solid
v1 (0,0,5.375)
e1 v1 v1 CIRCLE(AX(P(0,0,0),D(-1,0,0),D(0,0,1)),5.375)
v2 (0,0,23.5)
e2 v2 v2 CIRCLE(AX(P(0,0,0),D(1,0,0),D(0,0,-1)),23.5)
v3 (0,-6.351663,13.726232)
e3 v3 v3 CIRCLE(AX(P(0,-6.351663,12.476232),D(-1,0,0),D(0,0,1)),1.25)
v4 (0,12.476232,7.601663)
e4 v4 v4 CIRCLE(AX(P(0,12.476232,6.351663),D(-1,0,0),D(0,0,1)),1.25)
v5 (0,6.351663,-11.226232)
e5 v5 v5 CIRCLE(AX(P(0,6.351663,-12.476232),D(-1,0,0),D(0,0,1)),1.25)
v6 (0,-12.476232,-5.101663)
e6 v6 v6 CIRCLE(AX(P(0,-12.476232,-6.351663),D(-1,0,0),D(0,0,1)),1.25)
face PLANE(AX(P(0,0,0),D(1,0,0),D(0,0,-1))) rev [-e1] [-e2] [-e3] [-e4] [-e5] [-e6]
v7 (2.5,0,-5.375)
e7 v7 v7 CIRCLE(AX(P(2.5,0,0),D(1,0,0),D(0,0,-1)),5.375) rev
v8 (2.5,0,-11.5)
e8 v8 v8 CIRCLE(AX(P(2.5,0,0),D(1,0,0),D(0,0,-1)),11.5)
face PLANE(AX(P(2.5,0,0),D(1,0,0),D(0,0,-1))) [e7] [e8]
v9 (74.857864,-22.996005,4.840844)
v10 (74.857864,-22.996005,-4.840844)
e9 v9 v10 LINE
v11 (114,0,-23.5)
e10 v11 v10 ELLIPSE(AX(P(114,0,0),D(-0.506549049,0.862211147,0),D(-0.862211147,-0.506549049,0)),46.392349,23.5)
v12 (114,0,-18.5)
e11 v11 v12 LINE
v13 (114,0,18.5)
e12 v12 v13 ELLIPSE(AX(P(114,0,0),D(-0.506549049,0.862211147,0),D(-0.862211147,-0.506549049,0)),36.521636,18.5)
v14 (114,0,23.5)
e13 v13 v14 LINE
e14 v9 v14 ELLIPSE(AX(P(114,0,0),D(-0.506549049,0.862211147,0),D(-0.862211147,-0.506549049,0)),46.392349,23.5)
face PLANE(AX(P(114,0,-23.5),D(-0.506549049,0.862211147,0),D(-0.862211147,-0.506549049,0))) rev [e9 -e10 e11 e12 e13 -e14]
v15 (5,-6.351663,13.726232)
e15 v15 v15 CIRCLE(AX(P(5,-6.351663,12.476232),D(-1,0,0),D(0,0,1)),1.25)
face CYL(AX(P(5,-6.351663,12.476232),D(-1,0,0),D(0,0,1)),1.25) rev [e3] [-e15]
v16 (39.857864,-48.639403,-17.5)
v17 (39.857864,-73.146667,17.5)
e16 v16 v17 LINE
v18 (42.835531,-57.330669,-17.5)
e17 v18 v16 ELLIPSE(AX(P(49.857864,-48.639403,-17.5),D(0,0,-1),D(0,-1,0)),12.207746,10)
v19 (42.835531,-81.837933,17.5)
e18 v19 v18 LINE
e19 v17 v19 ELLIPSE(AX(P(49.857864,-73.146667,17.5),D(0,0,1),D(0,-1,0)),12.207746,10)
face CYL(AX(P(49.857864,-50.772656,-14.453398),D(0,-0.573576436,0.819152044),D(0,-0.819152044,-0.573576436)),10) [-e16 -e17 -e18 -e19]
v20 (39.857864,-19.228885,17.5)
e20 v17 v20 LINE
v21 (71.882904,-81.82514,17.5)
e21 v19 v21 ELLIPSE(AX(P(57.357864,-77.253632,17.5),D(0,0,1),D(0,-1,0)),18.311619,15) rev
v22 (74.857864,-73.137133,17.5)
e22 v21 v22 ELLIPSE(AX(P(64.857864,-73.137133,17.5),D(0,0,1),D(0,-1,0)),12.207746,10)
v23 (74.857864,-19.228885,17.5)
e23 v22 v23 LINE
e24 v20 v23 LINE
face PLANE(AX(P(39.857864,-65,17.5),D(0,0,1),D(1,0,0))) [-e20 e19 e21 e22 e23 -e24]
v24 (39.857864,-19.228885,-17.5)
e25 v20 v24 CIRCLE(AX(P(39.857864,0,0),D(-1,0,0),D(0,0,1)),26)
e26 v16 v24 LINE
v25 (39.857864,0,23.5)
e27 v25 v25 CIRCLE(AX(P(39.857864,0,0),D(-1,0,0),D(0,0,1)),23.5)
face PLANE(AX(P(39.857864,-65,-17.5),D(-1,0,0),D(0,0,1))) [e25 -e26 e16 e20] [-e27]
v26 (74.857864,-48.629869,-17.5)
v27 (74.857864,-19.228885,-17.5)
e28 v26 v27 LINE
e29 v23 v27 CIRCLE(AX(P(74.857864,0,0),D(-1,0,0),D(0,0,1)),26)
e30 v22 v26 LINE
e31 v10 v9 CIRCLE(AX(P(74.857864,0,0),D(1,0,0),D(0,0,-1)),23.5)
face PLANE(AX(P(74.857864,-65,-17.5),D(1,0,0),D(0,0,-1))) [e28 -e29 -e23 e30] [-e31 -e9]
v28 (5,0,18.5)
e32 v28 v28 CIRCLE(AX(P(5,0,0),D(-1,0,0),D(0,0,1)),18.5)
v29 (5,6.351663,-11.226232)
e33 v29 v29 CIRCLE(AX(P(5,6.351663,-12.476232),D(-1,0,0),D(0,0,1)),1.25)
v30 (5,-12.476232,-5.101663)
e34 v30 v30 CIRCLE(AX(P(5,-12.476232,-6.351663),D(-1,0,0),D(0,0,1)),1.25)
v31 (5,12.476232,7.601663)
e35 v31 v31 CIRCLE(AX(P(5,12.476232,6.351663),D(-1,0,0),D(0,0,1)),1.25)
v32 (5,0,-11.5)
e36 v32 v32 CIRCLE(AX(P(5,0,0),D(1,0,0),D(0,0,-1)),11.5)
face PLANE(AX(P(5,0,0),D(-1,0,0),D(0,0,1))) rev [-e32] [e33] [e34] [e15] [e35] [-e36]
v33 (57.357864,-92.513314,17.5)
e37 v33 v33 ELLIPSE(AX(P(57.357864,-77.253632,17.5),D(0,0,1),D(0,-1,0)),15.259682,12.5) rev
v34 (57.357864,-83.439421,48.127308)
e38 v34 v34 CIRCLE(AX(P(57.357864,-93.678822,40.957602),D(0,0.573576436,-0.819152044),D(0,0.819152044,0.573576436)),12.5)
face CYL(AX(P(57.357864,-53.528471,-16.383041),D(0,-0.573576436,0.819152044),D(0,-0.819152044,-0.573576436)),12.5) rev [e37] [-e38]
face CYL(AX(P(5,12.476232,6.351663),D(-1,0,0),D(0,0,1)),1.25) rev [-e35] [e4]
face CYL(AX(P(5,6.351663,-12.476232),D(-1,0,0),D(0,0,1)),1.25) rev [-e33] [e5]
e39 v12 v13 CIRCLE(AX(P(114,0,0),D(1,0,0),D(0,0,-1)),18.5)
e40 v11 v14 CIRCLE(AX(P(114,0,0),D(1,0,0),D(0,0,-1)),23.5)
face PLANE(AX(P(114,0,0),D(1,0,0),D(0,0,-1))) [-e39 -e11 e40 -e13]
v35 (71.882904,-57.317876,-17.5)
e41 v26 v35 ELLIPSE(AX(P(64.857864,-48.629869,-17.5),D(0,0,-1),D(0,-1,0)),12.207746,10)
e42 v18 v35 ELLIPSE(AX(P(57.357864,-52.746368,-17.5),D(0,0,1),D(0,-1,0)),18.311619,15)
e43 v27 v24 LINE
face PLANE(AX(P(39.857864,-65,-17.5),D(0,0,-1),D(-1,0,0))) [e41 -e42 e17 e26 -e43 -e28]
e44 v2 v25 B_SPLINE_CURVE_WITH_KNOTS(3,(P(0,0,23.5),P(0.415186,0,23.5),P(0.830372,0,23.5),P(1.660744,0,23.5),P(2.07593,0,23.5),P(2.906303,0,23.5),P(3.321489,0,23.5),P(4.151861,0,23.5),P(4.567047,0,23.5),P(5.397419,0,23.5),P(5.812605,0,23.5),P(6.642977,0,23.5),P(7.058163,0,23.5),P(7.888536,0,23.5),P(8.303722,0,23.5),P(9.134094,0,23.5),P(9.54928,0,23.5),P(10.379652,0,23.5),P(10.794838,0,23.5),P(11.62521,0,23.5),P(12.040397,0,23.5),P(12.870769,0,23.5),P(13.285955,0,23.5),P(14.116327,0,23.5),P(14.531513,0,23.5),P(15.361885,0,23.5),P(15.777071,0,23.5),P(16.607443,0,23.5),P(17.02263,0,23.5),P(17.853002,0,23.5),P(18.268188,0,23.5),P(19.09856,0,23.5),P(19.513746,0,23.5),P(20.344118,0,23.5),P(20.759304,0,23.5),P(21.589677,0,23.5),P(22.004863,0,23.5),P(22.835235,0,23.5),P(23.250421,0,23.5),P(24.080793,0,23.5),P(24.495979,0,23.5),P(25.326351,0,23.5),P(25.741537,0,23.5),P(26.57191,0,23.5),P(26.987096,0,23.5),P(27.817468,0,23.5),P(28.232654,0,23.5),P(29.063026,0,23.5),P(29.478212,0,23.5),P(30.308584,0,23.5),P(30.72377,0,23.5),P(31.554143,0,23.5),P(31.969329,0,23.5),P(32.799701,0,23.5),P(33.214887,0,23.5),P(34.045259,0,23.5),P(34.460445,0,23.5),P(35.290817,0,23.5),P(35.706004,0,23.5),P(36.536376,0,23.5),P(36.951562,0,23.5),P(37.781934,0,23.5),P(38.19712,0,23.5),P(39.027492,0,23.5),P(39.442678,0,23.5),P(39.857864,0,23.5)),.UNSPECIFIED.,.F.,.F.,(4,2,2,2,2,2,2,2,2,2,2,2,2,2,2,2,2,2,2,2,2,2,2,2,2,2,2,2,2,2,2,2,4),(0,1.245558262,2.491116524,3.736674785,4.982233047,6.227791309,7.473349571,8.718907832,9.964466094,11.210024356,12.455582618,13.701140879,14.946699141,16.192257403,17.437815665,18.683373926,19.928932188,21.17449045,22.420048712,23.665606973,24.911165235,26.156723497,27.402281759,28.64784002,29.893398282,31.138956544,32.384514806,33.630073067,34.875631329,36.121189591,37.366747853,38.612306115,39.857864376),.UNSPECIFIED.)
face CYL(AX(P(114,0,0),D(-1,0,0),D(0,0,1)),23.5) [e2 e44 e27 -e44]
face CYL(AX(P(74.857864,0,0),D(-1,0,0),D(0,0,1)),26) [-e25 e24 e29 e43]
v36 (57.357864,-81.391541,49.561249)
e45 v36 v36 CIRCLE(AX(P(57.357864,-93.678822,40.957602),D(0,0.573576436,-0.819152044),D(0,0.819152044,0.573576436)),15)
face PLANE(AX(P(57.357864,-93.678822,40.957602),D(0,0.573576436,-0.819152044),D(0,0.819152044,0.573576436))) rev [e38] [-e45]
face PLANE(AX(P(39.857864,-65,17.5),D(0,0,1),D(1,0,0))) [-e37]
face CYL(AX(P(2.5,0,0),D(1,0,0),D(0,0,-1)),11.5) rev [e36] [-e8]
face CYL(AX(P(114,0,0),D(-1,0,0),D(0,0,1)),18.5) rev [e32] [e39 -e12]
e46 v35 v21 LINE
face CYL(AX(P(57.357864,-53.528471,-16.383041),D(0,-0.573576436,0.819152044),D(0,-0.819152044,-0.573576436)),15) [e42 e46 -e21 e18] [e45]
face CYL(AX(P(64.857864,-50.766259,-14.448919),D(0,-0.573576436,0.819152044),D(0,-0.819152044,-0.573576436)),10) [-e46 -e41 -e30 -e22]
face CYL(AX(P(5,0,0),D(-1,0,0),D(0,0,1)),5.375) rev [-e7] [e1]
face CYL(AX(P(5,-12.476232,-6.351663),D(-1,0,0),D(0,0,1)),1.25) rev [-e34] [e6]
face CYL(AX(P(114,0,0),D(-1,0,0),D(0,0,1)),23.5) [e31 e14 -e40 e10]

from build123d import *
from build123d.topology import SkipClean

# Parameters (mm, degrees)
CROQUIS1_R              = 23.5
CROQUIS1_R_2            = 18.5
SALIENTE_EXTRUIR1_DEPTH = 114
CROQUIS2_R              = 23.5
CROQUIS2_R_2            = 5.375
CROQUIS2_R_3            = 1.25
SALIENTE_EXTRUIR2_DEPTH = 5
CORTAR_EXTRUIR1_DEPTH   = 23.5
CROQUIS6_R              = 11.5
CORTAR_EXTRUIR2_DEPTH   = 2.5
CROQUIS17_W             = 35
CROQUIS17_H             = 35
SALIENTE_EXTRUIR3_DEPTH = 65
CROQUIS18_R             = 15
CROQUIS18_R_2           = 12.5
SALIENTE_EXTRUIR4_DEPTH = 70
CROQUIS26_W             = 35
CROQUIS26_H             = 35
SALIENTE_EXTRUIR8_DEPTH = 40
CORTAR_EXTRUIR4_DEPTH   = 167.48351172
REDONDEO1_R             = 10
CROQUIS27_R             = 26
SALIENTE_EXTRUIR9_DEPTH = 35
CORTAR_EXTRUIR7_START   = -35
CROQUIS28_R             = 18.5
CORTAR_EXTRUIR7_DEPTH   = 35
CROQUIS25_W             = 13.336801646
CROQUIS25_H             = 44.473979809
CORTAR_EXTRUIR8_DEPTH   = 35


with BuildPart() as part:
    # Croquis1 → Saliente-Extruir1 (new body)
    with BuildSketch(Plane(origin=(0, 0, 0), x_dir=(0, 0, -1), z_dir=(1, 0, 0))):
        with Locations(Location((0, 0, 0), (0, 0, 180))):
            Circle(CROQUIS1_R)
        with Locations(Location((0, 0, 0), (0, 0, 180))):
            Circle(CROQUIS1_R_2, mode=Mode.SUBTRACT)
    extrude(amount=SALIENTE_EXTRUIR1_DEPTH)

    # Croquis2 → Saliente-Extruir2 (add)
    with BuildSketch(Plane.ZY):
        Circle(CROQUIS2_R)
        Circle(CROQUIS2_R_2, mode=Mode.SUBTRACT)
        with Locations((-12.476232327, 6.351663319)):
            Circle(CROQUIS2_R_3, mode=Mode.SUBTRACT)
        with Locations((-6.351663319, -12.476232327)):
            Circle(CROQUIS2_R_3, mode=Mode.SUBTRACT)
        with Locations((12.476232327, -6.351663319)):
            Circle(CROQUIS2_R_3, mode=Mode.SUBTRACT)
        with Locations((6.351663319, 12.476232327)):
            Circle(CROQUIS2_R_3, mode=Mode.SUBTRACT)
    extrude(amount=-SALIENTE_EXTRUIR2_DEPTH)

    # Croquis4 → Cortar-Extruir1 (cut, symmetric)
    with BuildSketch(Plane.XY):
        Polygon((114, 0), (74, -23.5), (114, -23.5), align=None)
    extrude(amount=CORTAR_EXTRUIR1_DEPTH, both=True, mode=Mode.SUBTRACT)

    # Croquis6 → Cortar-Extruir2 (cut)
    with BuildSketch(Plane(origin=(5, 0, 0), x_dir=(0, 0, -1), z_dir=(1, 0, 0))):
        Circle(CROQUIS6_R)
    extrude(amount=-CORTAR_EXTRUIR2_DEPTH, mode=Mode.SUBTRACT)

    # Croquis17 → Saliente-Extruir3 (add)
    with BuildSketch(Plane(origin=(0, 0, 0), x_dir=(1, 0, 0), z_dir=(0, 1, 0))):
        with Locations((57.357864376, 0)):
            Rectangle(CROQUIS17_W, CROQUIS17_H)
    extrude(amount=-SALIENTE_EXTRUIR3_DEPTH)

    # Croquis18 → Saliente-Extruir4 (add)
    with BuildSketch(Plane(origin=(57.357864376, -93.678821818, 40.957602214), x_dir=(-1, 0, 0), z_dir=(3.885780586188049e-15, 0.5735764363510475, -0.8191520442889909))):
        with Locations(Location((0, 0, 0), (0, 0, 222.003230743))):
            Circle(CROQUIS18_R)
        with Locations(Location((0, 0, 0), (0, 0, 233.418217826))):
            Circle(CROQUIS18_R_2, mode=Mode.SUBTRACT)
    extrude(amount=SALIENTE_EXTRUIR4_DEPTH)

    # Croquis26 → Saliente-Extruir8 (add)
    with BuildSketch(Plane.XZ.offset(65)):
        with Locations((57.357864376, 0)):
            Rectangle(CROQUIS26_W, CROQUIS26_H)
    extrude(amount=SALIENTE_EXTRUIR8_DEPTH)

    # Croquis23 → Cortar-Extruir4 (cut, through all)
    with SkipClean():  # the faces are left unmerged after this step: merging them gives an invalid solid
        with BuildSketch(Plane(origin=(0, -50.063167159, 71.49761239), x_dir=(-0.9999999349220849, -0.00029552642887780036, -0.0002069298332451758), z_dir=(-3.88580769124236e-15, -0.5735764363510474, 0.819152044288991))):
            with BuildLine():
                Line((-72.338651426, 53.265572477), (-106.285107353, 53.265572477))
                ThreePointArc((-106.285107353, 53.265572477), (-57.338651426, 102.212028404), (-8.392195499, 53.265572477))
                Line((-8.392195499, 53.265572477), (-42.338651426, 53.265572477))
                ThreePointArc((-42.338651426, 53.265572477), (-57.338651426, 68.265572477), (-72.338651426, 53.265572477))
            make_face()
        extrude(amount=-CORTAR_EXTRUIR4_DEPTH, mode=Mode.SUBTRACT)

    # Chaflán1
    # the kernel refuses this chamfer: 5 mm, written as the material it adds along each edge
    with BuildSketch(Plane(origin=(72.3578634, -83.735162365, 26.766019567), x_dir=(0.9996237628252941, 0.0224682639001608, 0.015732447753382475), z_dir=(3.88580769124236e-15, 0.5735764363510474, -0.819152044288991))) as chafl_n1_piece_1_section:
        with BuildLine():
            Line((4.52468849, 0), (-0.739014204, 3.853882904))
            Line((-0.739014204, 3.853882904), (-0.835126609, 3.826271211))
            ThreePointArc((-0.835126609, 3.826271211), (-0.28053556, 1.941134087), (-0.099963359, -0.002706805))
            Line((-0.099963359, -0.002706805), (0.002706805, -0.099963359))
            ThreePointArc((0.002706805, -0.099963359), (2.263393477, -0.038748553), (4.527395295, -0.099963359))
            Line((4.527395295, -0.099963359), (4.52468849, 0))
        make_face()
    chafl_n1_piece_1 = extrude(amount=65.350553059, mode=Mode.PRIVATE)
    chafl_n1_piece_1 = split(chafl_n1_piece_1, bisect_by=Plane(origin=(74.857864376, -66.849730794, 0.212642444), z_dir=(-1, 0, 0)), keep=Keep.TOP, mode=Mode.PRIVATE)
    chafl_n1_piece_1 = split(chafl_n1_piece_1, bisect_by=Plane(origin=(73.269970471, -66.849730794, -17.5), z_dir=(0, 0, 1)), keep=Keep.TOP, mode=Mode.PRIVATE)
    chafl_n1_piece_1 = split(chafl_n1_piece_1, bisect_by=Plane(origin=(73.269970471, -66.849730794, 17.5), z_dir=(0, 0, -1)), keep=Keep.TOP, mode=Mode.PRIVATE)
    chafl_n1_piece_1 = split(chafl_n1_piece_1, bisect_by=Plane(origin=(73.269970471, -54.669749998, -17.182172852), z_dir=(-3.8857805861880495e-15, -0.5735764363510475, 0.8191520442889909)), keep=Keep.TOP, mode=Mode.PRIVATE)
    add(chafl_n1_piece_1)
    with BuildSketch(Plane(origin=(72.3578634, -83.735162365, 26.766019567), x_dir=(0.9996237628252941, 0.0224682639001608, 0.015732447753382475), z_dir=(3.88580769124236e-15, 0.5735764363510474, -0.819152044288991))) as chafl_n1_piece_2_section:
        with BuildLine():
            Line((4.52468849, 0), (-0.739014204, 3.853882904))
            Line((-0.739014204, 3.853882904), (-0.835126609, 3.826271211))
            ThreePointArc((-0.835126609, 3.826271211), (-0.28053556, 1.941134087), (-0.099963359, -0.002706805))
            Line((-0.099963359, -0.002706805), (0.002706805, -0.099963359))
            ThreePointArc((0.002706805, -0.099963359), (2.263393477, -0.038748553), (4.527395295, -0.099963359))
            Line((4.527395295, -0.099963359), (4.52468849, 0))
        make_face()
    chafl_n1_piece_2 = extrude(amount=65.350553059, mode=Mode.PRIVATE)
    chafl_n1_piece_2 = split(chafl_n1_piece_2, bisect_by=Plane(origin=(72.410675533, -56.139333536, -17.5), z_dir=(0, 0, -1)), keep=Keep.TOP, mode=Mode.PRIVATE)
    chafl_n1_piece_2 = split(chafl_n1_piece_2, bisect_by=Plane(origin=(72.410675533, -55.939365699, -18.071167337), z_dir=(-3.8857805861880495e-15, -0.5735764363510475, 0.8191520442889909)), keep=Keep.TOP, mode=Mode.PRIVATE)
    add(chafl_n1_piece_2)
    with BuildSketch(Plane(origin=(72.3578634, -83.735162365, 26.766019567), x_dir=(0.9996237628252941, 0.0224682639001608, 0.015732447753382475), z_dir=(3.88580769124236e-15, 0.5735764363510474, -0.819152044288991))) as chafl_n1_piece_3_section:
        with BuildLine():
            Line((4.52468849, 0), (-0.739014204, 3.853882904))
            Line((-0.739014204, 3.853882904), (-0.835126609, 3.826271211))
            ThreePointArc((-0.835126609, 3.826271211), (-0.28053556, 1.941134087), (-0.099963359, -0.002706805))
            Line((-0.099963359, -0.002706805), (0.002706805, -0.099963359))
            ThreePointArc((0.002706805, -0.099963359), (2.263393477, -0.038748553), (4.527395295, -0.099963359))
            Line((4.527395295, -0.099963359), (4.52468849, 0))
        make_face()
    chafl_n1_piece_3 = extrude(amount=65.350553059, mode=Mode.PRIVATE)
    chafl_n1_piece_3 = split(chafl_n1_piece_3, bisect_by=Plane(origin=(74.857864376, -53.732391069, -17.108811543), z_dir=(-1, 0, 0)), keep=Keep.TOP, mode=Mode.PRIVATE)
    chafl_n1_piece_3 = split(chafl_n1_piece_3, bisect_by=Plane(origin=(73.550293703, -53.732391069, -17.5), z_dir=(0, 0, 1)), keep=Keep.TOP, mode=Mode.PRIVATE)
    chafl_n1_piece_3 = split(chafl_n1_piece_3, bisect_by=Plane(origin=(73.550293703, -54.006304175, -16.717623086), z_dir=(3.8857805861880495e-15, 0.5735764363510475, -0.8191520442889909)), keep=Keep.TOP, mode=Mode.PRIVATE)
    add(chafl_n1_piece_3)
    with BuildSketch(Plane(origin=(42.357865352, -83.748374972, 26.766019567), x_dir=(0.1620303972007153, -0.8083275784914744, -0.5659970638025322), z_dir=(3.88580769124236e-15, 0.5735764363510474, -0.819152044288991))) as chafl_n1_piece_4_section:
        with BuildLine():
            Line((3.924099314, 0), (-0.852121415, 4.443725355))
            Line((-0.852121415, 4.443725355), (-0.950805831, 4.427557917))
            ThreePointArc((-0.950805831, 4.427557917), (-0.464313507, 2.215595733), (-0.098684416, -0.016167438))
            Line((-0.098684416, -0.016167438), (0.016167438, -0.098684416))
            ThreePointArc((0.016167438, -0.098684416), (1.959232583, 0.090052375), (3.915082265, -0.099592634))
            Line((3.915082265, -0.099592634), (3.924099314, 0))
        make_face()
    chafl_n1_piece_4 = extrude(amount=65.350553059, mode=Mode.PRIVATE)
    chafl_n1_piece_4 = split(chafl_n1_piece_4, bisect_by=Plane(origin=(41.446565804, -66.861949612, -17.5), z_dir=(0, 0, 1)), keep=Keep.TOP, mode=Mode.PRIVATE)
    chafl_n1_piece_4 = split(chafl_n1_piece_4, bisect_by=Plane(origin=(39.857864376, -66.861949612, 0.210272202), z_dir=(1, 0, 0)), keep=Keep.TOP, mode=Mode.PRIVATE)
    chafl_n1_piece_4 = split(chafl_n1_piece_4, bisect_by=Plane(origin=(41.446565804, -66.861949612, 17.5), z_dir=(0, 0, -1)), keep=Keep.TOP, mode=Mode.PRIVATE)
    chafl_n1_piece_4 = split(chafl_n1_piece_4, bisect_by=Plane(origin=(41.446565804, -54.679062597, -17.188693604), z_dir=(-3.8857805861880495e-15, -0.5735764363510475, 0.8191520442889909)), keep=Keep.TOP, mode=Mode.PRIVATE)
    add(chafl_n1_piece_4)
    with BuildSketch(Plane(origin=(42.357865352, -83.748374972, 26.766019567), x_dir=(0.1620303972007153, -0.8083275784914744, -0.5659970638025322), z_dir=(3.88580769124236e-15, 0.5735764363510474, -0.819152044288991))) as chafl_n1_piece_5_section:
        with BuildLine():
            Line((3.924099314, 0), (-0.852121415, 4.443725355))
            Line((-0.852121415, 4.443725355), (-0.950805831, 4.427557917))
            ThreePointArc((-0.950805831, 4.427557917), (-0.464313507, 2.215595733), (-0.098684416, -0.016167438))
            Line((-0.098684416, -0.016167438), (0.016167438, -0.098684416))
            ThreePointArc((0.016167438, -0.098684416), (1.959232583, 0.090052375), (3.915082265, -0.099592634))
            Line((3.915082265, -0.099592634), (3.924099314, 0))
        make_face()
    chafl_n1_piece_5 = extrude(amount=65.350553059, mode=Mode.PRIVATE)
    chafl_n1_piece_5 = split(chafl_n1_piece_5, bisect_by=Plane(origin=(41.165608091, -53.740671541, -17.5), z_dir=(0, 0, 1)), keep=Keep.TOP, mode=Mode.PRIVATE)
    chafl_n1_piece_5 = split(chafl_n1_piece_5, bisect_by=Plane(origin=(39.857864376, -53.740671541, -17.111139805), z_dir=(1, 0, 0)), keep=Keep.TOP, mode=Mode.PRIVATE)
    chafl_n1_piece_5 = split(chafl_n1_piece_5, bisect_by=Plane(origin=(41.165608091, -54.012954381, -16.72227961), z_dir=(3.8857805861880495e-15, 0.5735764363510475, -0.8191520442889909)), keep=Keep.TOP, mode=Mode.PRIVATE)
    add(chafl_n1_piece_5)
    with BuildSketch(Plane(origin=(42.357865352, -83.748374972, 26.766019567), x_dir=(0.1620303972007153, -0.8083275784914744, -0.5659970638025322), z_dir=(3.88580769124236e-15, 0.5735764363510474, -0.819152044288991))) as chafl_n1_piece_6_section:
        with BuildLine():
            Line((3.924099314, 0), (-0.852121415, 4.443725355))
            Line((-0.852121415, 4.443725355), (-0.950805831, 4.427557917))
            ThreePointArc((-0.950805831, 4.427557917), (-0.464313507, 2.215595733), (-0.098684416, -0.016167438))
            Line((-0.098684416, -0.016167438), (0.016167438, -0.098684416))
            ThreePointArc((0.016167438, -0.098684416), (1.959232583, 0.090052375), (3.915082265, -0.099592634))
            Line((3.915082265, -0.099592634), (3.924099314, 0))
        make_face()
    chafl_n1_piece_6 = extrude(amount=65.350553059, mode=Mode.PRIVATE)
    chafl_n1_piece_6 = split(chafl_n1_piece_6, bisect_by=Plane(origin=(42.302537866, -56.144513508, -17.5), z_dir=(0, 0, -1)), keep=Keep.TOP, mode=Mode.PRIVATE)
    chafl_n1_piece_6 = split(chafl_n1_piece_6, bisect_by=Plane(origin=(42.302537866, -55.943525833, -18.074080294), z_dir=(-3.8857805861880495e-15, -0.5735764363510475, 0.8191520442889909)), keep=Keep.TOP, mode=Mode.PRIVATE)
    add(chafl_n1_piece_6)

    # Redondeo1
    # the kernel refuses this fillet: 10 mm, written as the material it takes off along each edge
    with BuildSketch(Plane(origin=(74.857864376, -47.604392117, -27.351708624), x_dir=(-0.7903484372830198, -0.5018597340774087, -0.35140596892489034), z_dir=(0, -0.5735764363510114, 0.8191520442890161))) as redondeo1_piece_1:
        with BuildLine():
            CenterArc((4.95618085, -9.928694439), REDONDEO1_R, 96.846328464, 45.371756964)
            Line((-2.947303523, -3.802118334), (-3.10537321, -3.679586812))
            Line((-3.10537321, -3.679586812), (-0.158069687, 0.122531522))
            Line((-0.158069687, 0.122531522), (0, 0.2))
            ThreePointArc((0, 0.2), (1.882056296, 0.2), (3.740271227, 0.198573889))
            Line((3.740271227, 0.198573889), (3.764112592, 0))
        make_face()
    extrude(amount=66.780541695, mode=Mode.SUBTRACT)
    with BuildSketch(Plane(origin=(39.857864376, -85.928316508, 27.359920723), x_dir=(0.7907902899043229, -0.5013924657655409, -0.35107878413055366), z_dir=(0, 0.5735764363510112, -0.8191520442890163))) as redondeo1_piece_2:
        with BuildLine():
            CenterArc((4.960889033, -9.928286868), REDONDEO1_R, 96.86589021, 45.393536548)
            Line((-2.947013866, -3.807415056), (-3.105171924, -3.68499762))
            Line((-3.105171924, -3.68499762), (-0.158158058, 0.122417436))
            Line((-0.158158058, 0.122417436), (0, 0.2))
            ThreePointArc((0, 0.2), (1.882715511, 0.2), (3.741521861, 0.198565737))
            Line((3.741521861, 0.198565737), (3.765431021, 0))
        make_face()
    extrude(amount=66.800591939, mode=Mode.SUBTRACT)

    # Croquis27 → Saliente-Extruir9 (add)
    with BuildSketch(Plane.ZY.offset(-39.857864376)):
        Circle(CROQUIS27_R)
    extrude(amount=-SALIENTE_EXTRUIR9_DEPTH)

    # Croquis28 → Cortar-Extruir7 (cut)
    with BuildSketch(Plane(origin=(74.857864376, 0, 0), x_dir=(0, 0, -1), z_dir=(1, 0, 0)).offset(CORTAR_EXTRUIR7_START)):
        with Locations(Location((0, 0, 0), (0, 0, 180))):
            Circle(CROQUIS28_R)
    extrude(amount=CORTAR_EXTRUIR7_DEPTH, mode=Mode.SUBTRACT)

    # Croquis25 → Cortar-Extruir8 (cut)
    with BuildSketch(Plane.ZY.offset(-39.857864376)):
        with Locations((-24.168400823, -61.036222495)):
            Rectangle(CROQUIS25_W, CROQUIS25_H)
    extrude(amount=-CORTAR_EXTRUIR8_DEPTH, mode=Mode.SUBTRACT)


solid = part.part
